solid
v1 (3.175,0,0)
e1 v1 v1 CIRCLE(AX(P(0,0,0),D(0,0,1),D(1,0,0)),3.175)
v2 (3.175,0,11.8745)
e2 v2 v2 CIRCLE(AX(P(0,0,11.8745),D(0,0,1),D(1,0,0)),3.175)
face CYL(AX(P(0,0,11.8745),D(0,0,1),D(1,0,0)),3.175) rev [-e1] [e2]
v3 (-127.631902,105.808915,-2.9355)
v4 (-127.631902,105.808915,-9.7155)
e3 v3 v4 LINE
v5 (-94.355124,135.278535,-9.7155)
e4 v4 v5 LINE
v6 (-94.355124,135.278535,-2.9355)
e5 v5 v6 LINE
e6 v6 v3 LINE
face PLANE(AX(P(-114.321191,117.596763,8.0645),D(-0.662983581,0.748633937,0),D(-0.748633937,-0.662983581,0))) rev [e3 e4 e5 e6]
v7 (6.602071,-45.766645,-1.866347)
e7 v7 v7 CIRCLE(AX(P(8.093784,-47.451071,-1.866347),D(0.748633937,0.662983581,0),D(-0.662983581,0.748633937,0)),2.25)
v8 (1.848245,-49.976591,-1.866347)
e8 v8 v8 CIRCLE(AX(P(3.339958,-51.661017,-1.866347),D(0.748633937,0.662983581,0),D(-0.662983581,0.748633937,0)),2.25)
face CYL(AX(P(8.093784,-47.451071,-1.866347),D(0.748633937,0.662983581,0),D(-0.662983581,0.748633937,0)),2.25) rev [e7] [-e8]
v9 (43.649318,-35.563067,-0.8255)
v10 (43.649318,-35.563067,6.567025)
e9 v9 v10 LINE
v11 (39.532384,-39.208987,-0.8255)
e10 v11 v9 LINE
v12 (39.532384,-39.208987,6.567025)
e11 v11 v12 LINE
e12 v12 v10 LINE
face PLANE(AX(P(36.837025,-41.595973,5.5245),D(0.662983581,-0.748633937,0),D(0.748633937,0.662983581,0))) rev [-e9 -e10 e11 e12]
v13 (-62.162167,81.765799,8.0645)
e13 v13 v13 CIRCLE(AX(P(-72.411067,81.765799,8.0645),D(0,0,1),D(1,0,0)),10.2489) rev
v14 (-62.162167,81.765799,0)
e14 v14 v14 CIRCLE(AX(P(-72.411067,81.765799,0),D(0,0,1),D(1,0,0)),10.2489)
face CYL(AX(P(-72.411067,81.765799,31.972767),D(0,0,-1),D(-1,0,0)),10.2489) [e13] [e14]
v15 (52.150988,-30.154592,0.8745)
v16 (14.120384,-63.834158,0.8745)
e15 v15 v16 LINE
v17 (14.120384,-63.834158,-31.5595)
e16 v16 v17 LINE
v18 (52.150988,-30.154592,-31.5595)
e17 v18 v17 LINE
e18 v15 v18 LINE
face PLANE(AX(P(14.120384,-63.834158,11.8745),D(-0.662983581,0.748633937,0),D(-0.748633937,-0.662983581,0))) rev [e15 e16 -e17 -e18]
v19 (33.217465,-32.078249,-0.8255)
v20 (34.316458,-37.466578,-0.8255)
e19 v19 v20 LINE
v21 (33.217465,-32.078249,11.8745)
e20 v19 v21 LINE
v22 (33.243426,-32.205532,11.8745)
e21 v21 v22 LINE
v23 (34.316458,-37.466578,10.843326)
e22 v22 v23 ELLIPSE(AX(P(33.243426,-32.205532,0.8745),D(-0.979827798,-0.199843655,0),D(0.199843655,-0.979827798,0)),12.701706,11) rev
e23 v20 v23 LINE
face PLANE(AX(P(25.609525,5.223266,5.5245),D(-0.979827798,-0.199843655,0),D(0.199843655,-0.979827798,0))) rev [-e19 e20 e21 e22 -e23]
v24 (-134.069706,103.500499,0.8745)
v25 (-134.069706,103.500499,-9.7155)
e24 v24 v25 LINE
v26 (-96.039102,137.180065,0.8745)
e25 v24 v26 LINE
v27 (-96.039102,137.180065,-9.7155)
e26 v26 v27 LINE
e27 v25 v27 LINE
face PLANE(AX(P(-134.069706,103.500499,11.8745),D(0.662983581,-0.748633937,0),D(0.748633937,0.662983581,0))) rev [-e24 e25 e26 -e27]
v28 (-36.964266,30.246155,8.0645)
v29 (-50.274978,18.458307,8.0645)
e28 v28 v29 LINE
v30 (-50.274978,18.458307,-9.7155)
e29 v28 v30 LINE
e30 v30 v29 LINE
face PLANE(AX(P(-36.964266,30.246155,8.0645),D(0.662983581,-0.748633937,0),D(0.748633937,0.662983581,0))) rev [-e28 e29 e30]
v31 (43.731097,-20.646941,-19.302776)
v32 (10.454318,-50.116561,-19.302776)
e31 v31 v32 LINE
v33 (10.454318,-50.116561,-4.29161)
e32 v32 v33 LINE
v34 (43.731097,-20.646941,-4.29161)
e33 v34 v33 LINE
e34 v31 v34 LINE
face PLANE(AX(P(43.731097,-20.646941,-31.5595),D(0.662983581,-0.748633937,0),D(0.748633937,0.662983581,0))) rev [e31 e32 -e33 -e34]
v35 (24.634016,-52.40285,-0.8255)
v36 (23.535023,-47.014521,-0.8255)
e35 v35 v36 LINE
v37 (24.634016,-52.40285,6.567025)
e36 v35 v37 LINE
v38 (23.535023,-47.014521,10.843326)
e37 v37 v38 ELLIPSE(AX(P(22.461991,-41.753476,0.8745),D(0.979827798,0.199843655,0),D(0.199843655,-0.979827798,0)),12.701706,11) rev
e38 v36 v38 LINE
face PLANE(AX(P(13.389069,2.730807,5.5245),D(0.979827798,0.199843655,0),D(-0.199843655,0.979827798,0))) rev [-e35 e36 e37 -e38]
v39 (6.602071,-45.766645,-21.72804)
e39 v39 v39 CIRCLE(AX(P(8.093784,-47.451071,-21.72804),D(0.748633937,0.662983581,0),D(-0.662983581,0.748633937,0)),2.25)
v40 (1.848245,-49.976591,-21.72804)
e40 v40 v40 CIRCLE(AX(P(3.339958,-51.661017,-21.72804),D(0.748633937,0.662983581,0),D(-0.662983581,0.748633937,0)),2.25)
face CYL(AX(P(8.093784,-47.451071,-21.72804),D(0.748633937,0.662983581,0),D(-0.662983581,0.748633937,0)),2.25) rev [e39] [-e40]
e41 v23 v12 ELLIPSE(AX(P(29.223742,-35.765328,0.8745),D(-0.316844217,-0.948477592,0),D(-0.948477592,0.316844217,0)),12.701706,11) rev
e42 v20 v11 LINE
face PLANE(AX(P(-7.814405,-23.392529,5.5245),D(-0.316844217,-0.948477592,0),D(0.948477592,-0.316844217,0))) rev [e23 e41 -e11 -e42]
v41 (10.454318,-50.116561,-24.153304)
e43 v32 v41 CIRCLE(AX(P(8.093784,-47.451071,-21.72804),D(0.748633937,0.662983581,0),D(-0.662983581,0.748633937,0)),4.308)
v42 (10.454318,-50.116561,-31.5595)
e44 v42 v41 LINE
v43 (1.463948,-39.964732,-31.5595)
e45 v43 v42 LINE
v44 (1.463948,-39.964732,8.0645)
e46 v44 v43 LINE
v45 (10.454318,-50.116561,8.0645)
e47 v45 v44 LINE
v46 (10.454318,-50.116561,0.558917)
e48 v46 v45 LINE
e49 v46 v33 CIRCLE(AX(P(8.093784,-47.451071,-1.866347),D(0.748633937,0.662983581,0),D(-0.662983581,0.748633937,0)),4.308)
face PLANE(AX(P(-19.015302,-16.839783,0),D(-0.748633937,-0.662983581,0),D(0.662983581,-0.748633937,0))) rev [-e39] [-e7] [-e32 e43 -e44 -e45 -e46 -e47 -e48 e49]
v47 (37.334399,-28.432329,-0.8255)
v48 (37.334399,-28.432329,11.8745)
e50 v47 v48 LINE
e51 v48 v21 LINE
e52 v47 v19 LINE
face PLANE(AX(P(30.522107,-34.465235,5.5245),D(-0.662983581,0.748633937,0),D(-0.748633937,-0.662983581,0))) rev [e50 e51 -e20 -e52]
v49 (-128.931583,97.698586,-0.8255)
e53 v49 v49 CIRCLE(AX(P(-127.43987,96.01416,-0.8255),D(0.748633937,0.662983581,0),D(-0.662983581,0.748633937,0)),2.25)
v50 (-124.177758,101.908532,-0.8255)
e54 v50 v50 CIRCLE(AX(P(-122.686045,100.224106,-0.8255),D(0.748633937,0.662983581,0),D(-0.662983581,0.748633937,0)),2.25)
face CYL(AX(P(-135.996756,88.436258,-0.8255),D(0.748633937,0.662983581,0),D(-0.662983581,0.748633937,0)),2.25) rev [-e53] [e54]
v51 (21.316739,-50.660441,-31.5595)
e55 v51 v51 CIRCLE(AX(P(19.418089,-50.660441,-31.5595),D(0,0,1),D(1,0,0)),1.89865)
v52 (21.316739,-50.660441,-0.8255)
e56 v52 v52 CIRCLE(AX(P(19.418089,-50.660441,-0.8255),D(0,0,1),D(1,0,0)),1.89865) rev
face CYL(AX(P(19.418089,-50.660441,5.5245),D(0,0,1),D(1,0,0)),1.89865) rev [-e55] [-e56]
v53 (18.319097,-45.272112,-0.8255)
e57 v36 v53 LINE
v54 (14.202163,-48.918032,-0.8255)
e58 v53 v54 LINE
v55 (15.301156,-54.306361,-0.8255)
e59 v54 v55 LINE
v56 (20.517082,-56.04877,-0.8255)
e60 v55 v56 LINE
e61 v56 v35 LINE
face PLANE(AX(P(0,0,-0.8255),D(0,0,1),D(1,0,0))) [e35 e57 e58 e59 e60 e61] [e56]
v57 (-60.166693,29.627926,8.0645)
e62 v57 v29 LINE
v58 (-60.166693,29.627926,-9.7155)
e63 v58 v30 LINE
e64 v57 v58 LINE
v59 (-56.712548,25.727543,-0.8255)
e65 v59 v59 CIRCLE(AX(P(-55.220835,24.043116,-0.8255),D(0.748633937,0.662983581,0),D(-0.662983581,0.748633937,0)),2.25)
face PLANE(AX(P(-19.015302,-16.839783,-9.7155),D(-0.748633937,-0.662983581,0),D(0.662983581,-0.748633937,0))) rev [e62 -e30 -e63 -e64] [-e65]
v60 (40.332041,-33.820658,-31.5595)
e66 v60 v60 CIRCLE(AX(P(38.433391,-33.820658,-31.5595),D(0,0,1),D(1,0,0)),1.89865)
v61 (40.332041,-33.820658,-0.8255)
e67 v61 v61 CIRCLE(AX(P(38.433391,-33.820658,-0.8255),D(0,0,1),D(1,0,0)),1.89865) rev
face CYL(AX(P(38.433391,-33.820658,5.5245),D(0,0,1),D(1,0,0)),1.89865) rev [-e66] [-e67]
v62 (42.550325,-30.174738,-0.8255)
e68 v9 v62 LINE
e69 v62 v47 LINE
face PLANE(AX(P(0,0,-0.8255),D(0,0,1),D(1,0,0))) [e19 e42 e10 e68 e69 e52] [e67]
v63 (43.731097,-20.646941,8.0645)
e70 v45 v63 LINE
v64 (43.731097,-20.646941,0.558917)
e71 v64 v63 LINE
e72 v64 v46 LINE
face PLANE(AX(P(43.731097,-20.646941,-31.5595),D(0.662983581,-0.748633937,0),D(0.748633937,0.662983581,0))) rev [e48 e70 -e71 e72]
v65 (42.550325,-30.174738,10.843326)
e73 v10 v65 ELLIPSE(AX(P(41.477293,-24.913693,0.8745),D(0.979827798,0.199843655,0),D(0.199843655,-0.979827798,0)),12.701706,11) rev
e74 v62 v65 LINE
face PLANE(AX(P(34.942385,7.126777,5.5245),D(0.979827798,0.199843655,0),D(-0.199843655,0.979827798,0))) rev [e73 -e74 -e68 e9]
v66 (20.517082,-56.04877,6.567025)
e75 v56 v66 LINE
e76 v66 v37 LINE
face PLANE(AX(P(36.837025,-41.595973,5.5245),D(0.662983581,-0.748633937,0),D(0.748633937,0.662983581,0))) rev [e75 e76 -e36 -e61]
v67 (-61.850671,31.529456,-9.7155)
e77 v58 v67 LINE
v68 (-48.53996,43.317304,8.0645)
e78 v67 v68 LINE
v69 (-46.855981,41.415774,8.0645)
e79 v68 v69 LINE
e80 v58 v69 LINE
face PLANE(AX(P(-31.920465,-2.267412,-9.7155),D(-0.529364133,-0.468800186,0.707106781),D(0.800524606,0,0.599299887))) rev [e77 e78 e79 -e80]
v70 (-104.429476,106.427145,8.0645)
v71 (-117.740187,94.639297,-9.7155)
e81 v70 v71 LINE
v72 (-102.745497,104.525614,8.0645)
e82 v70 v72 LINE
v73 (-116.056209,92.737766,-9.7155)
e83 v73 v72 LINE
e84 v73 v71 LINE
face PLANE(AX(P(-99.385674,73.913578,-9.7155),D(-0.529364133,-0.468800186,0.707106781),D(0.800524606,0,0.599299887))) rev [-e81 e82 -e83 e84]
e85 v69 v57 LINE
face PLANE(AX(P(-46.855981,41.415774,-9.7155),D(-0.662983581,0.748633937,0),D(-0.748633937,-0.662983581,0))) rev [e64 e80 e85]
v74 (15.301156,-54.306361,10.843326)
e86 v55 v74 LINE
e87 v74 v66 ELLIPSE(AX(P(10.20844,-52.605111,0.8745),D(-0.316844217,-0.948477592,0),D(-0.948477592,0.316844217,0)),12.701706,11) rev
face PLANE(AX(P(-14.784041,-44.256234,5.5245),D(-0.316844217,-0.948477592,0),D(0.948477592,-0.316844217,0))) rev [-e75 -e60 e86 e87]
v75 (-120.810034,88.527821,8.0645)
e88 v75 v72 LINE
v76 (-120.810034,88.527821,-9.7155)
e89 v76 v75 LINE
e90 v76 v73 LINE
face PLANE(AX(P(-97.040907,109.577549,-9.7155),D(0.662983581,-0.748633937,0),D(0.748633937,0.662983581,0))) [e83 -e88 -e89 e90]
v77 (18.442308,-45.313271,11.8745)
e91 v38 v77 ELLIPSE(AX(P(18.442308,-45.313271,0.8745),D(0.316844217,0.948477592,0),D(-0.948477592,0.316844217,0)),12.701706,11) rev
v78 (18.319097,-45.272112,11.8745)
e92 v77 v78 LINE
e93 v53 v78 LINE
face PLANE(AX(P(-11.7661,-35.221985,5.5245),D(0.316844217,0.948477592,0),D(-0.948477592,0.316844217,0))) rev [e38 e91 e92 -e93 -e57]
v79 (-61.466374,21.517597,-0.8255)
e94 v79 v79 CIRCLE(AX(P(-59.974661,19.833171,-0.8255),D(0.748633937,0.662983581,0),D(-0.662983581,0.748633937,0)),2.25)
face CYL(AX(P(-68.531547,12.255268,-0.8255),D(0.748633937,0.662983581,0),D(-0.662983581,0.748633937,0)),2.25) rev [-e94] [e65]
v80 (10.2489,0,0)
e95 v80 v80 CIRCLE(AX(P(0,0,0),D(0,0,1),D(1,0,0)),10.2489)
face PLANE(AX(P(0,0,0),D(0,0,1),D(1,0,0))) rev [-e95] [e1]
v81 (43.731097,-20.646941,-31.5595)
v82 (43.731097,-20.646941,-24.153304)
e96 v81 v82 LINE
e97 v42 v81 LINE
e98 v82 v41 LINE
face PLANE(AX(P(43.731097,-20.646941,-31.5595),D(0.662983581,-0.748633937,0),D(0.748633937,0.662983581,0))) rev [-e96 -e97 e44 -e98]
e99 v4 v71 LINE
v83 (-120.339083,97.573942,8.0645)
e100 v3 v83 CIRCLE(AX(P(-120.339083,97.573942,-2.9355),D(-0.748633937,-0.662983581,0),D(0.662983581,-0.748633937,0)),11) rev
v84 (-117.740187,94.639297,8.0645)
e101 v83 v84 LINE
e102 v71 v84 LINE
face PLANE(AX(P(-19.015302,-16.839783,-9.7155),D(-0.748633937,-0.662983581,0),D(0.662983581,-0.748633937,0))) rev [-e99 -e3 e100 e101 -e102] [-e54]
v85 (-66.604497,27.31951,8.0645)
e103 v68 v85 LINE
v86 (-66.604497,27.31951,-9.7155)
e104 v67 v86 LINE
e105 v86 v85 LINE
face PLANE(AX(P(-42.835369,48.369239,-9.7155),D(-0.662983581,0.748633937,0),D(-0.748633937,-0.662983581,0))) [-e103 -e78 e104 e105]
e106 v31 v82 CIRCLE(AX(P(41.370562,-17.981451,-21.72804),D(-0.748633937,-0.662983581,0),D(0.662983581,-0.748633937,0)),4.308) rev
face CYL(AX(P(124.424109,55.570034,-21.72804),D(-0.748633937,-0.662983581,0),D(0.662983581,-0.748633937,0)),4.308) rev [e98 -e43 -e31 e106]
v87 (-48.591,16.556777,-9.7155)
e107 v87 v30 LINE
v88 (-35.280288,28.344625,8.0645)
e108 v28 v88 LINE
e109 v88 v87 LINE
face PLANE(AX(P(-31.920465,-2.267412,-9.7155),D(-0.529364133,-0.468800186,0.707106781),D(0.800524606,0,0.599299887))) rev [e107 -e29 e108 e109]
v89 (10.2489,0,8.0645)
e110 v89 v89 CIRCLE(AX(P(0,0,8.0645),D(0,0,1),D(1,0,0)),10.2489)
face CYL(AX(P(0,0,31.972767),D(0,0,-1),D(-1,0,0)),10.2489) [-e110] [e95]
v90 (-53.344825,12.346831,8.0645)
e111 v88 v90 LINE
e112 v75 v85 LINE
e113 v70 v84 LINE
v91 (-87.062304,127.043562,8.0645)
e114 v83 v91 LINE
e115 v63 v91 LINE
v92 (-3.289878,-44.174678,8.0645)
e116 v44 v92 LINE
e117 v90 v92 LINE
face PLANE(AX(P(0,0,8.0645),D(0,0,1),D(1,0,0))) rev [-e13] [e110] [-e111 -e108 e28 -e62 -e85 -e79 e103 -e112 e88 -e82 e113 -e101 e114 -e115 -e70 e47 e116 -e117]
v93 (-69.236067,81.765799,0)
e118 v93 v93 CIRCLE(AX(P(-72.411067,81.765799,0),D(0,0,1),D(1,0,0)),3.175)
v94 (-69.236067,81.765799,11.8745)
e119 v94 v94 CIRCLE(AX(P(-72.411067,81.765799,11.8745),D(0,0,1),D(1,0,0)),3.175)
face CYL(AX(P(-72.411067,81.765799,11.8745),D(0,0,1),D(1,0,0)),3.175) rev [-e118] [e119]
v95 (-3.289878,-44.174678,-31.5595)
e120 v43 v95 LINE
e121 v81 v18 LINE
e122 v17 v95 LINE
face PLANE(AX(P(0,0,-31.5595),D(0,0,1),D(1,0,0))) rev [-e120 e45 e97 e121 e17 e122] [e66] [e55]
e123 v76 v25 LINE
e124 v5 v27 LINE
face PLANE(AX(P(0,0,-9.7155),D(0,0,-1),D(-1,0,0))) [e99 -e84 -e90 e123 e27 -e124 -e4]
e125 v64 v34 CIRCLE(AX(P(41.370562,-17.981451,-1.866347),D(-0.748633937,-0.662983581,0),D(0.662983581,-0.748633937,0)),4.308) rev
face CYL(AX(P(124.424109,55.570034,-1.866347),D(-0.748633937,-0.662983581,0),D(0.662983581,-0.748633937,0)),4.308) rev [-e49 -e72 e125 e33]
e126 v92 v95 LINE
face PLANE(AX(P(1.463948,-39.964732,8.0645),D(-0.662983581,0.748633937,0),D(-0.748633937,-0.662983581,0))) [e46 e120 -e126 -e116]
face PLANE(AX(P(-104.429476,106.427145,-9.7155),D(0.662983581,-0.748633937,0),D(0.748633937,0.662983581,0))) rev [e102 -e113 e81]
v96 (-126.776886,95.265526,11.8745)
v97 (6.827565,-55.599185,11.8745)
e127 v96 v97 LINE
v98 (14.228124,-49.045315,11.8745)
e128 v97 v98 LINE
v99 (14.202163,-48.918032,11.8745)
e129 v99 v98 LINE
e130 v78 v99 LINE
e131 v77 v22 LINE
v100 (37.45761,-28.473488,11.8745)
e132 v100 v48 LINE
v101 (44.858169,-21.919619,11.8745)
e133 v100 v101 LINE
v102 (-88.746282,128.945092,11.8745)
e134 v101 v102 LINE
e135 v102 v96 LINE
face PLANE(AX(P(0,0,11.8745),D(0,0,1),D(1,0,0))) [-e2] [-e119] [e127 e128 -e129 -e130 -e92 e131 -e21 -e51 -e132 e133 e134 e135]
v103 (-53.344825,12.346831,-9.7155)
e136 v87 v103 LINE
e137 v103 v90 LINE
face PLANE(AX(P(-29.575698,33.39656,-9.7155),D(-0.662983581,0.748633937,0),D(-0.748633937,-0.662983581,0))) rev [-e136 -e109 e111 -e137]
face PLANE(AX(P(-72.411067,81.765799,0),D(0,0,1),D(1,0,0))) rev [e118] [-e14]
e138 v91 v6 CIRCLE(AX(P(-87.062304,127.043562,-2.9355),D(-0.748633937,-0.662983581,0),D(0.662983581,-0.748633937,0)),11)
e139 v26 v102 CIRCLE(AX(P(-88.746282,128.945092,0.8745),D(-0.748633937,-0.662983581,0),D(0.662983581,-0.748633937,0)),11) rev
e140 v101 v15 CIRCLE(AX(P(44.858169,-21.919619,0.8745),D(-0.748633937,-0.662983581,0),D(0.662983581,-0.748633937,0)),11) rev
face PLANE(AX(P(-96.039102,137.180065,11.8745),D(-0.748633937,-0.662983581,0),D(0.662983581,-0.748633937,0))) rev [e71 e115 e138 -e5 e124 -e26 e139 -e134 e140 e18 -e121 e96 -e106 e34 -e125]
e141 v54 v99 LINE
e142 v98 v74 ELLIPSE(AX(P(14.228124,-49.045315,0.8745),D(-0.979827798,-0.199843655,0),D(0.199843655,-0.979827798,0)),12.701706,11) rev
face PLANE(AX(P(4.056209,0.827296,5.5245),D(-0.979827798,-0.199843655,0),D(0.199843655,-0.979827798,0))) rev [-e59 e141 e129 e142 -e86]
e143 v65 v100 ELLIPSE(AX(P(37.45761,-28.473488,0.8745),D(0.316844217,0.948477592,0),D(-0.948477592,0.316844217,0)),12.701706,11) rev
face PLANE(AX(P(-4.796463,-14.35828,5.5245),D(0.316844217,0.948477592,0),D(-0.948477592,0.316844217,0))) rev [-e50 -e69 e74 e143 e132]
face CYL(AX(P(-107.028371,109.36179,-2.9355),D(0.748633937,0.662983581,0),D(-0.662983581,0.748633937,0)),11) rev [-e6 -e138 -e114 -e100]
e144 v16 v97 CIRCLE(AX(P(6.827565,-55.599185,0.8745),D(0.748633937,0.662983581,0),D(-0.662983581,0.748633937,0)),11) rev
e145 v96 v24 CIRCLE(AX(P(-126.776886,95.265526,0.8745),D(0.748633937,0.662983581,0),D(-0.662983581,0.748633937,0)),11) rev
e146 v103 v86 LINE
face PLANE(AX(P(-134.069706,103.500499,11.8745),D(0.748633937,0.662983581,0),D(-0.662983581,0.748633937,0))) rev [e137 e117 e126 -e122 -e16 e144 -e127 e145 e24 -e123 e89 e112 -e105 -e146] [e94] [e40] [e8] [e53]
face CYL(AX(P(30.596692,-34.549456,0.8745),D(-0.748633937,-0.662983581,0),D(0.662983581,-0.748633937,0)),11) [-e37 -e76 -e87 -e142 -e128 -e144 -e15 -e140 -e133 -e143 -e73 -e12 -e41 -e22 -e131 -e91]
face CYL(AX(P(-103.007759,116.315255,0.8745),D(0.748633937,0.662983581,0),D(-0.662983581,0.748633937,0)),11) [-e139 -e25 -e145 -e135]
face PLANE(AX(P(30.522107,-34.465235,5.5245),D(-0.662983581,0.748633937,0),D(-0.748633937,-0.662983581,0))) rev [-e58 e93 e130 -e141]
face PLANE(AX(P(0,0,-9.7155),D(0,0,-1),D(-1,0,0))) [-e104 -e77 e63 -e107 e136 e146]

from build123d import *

# Parameters (mm, degrees)
SKETCH1_R                   = 10.2489
BOSS_EXTRUDE1_DEPTH         = 2.9845
BOSS_EXTRUDE1_2_DEPTH       = 2.9845
SKETCH2_R                   = 10.2489
BOSS_EXTRUDE2_DEPTH         = 5.08
BOSS_EXTRUDE3_DEPTH         = 3.81
F_1_4_0_25_DIAMETER_HOLE1_D = 6.35
BOSS_EXTRUDE4_DEPTH         = 17.78
SKETCH8_R                   = 2.25
CUT_EXTRUDE1_DEPTH          = 17.78
SKETCH9_W                   = 17.78
SKETCH9_H                   = 2.54
BOSS_EXTRUDE5_DEPTH         = 17.78
CUT_EXTRUDE2_REACH          = 251.039
CUT_EXTRUDE3_DEPTH          = 20
BOSS_EXTRUDE6_DEPTH         = 2.54
BOSS_EXTRUDE7_DEPTH         = 39.624
CUT_EXTRUDE5_DEPTH          = 6.35
F_6_CLEARANCE_HOLE1_D       = 3.7973
SKETCH19_W                  = 39.624
SKETCH19_H                  = 13.560471889
BOSS_EXTRUDE8_DEPTH         = 6.35
M4_CLEARANCE_HOLE1_D        = 4.5
SKETCH20_R                  = 4.308
CUT_EXTRUDE6_DEPTH          = 195.822050963
FILLET1_R                   = 11
CUT_EXTRUDE7_DEPTH          = 6.35


with BuildPart() as part:
    # Sketch1 → Boss-Extrude1 (new body)
    with BuildSketch(Plane.XY):
        Circle(SKETCH1_R)
    extrude(amount=BOSS_EXTRUDE1_DEPTH)



with BuildPart() as body_2:
    # Sketch1 → Boss-Extrude1 2 (new body)
    with BuildSketch(Plane.XY):
        with Locations((-72.411066703, 81.765798589)):
            Circle(SKETCH1_R)
    extrude(amount=BOSS_EXTRUDE1_2_DEPTH)


with BuildPart() as part_1:
    add(part.part)

    add(body_2.part)  # Boss-Extrude2 merges body 2
    # Sketch2 → Boss-Extrude2 (add)
    with BuildSketch(Plane.XY.offset(2.9845)):
        with Locations((-72.411066703, 81.765798589)):
            Circle(SKETCH2_R)
        Circle(SKETCH2_R)
    extrude(amount=BOSS_EXTRUDE2_DEPTH)

    # Sketch3 → Boss-Extrude3 (add)
    with BuildSketch(Plane.XY.offset(8.0645)):
        Polygon((-134.069705847, 103.500499391), (-96.039101852, 137.180065299), (52.150988145, -30.154592279), (14.12038415, -63.834158187), align=None)
    extrude(amount=BOSS_EXTRUDE3_DEPTH)

    # 1/4 (0.25) Diameter Hole1 (through all)
    with Locations(Plane.XY.offset(11.8745)):
        with Locations((0, 0), (-72.411066703, 81.765798589)):
            Hole(F_1_4_0_25_DIAMETER_HOLE1_D / 2)

    # Sketch7 → Boss-Extrude4 (add)
    with BuildSketch(Plane(origin=(0, 0, 8.0645), x_dir=(-1, 0, 0), z_dir=(0, 0, -1))):
        Polygon((53.34482504, 12.346831233), (66.604496657, 27.319509971), (61.850671158, 31.529455709), (48.59099954, 16.556776971), align=None)
        Polygon((120.810034229, 88.527820652), (134.069705847, 103.500499391), (129.315880348, 107.710445129), (116.05620873, 92.737766391), align=None)
    extrude(amount=BOSS_EXTRUDE4_DEPTH)

    # Sketch8 → Cut-Extrude1 (cut)
    with BuildSketch(Plane(origin=(-19.015301997, -16.839782954, 0), x_dir=(0, 0, -1), z_dir=(0.7486339369082552, 0.6629835808745542, 0))):
        with Locations(Location((0.8255, 54.61, 0), (0, 0, 90))):
            Circle(SKETCH8_R)
        with Locations(Location((0.8255, 156.37, 0), (0, 0, 90))):
            Circle(SKETCH8_R)
    extrude(amount=-CUT_EXTRUDE1_DEPTH, mode=Mode.SUBTRACT)

    # Sketch9 → Boss-Extrude5 (add)
    with BuildSketch(Plane(origin=(-19.015301997, -16.839782954, 0), x_dir=(0, 0, -1), z_dir=(0.7486339369082552, 0.6629835808745542, 0))):
        with Locations((0.8255, 63.34)):
            Rectangle(SKETCH9_W, SKETCH9_H)
        with Locations((0.8255, 45.88)):
            Rectangle(SKETCH9_W, SKETCH9_H)
        with Locations((0.8255, 165.1)):
            Rectangle(SKETCH9_W, SKETCH9_H)
        with Locations((0.8255, 147.64)):
            Rectangle(SKETCH9_W, SKETCH9_H)
    extrude(amount=BOSS_EXTRUDE5_DEPTH)

    # Cut-Extrude2: up to this face of the body (flat: up to its plane)
    cut_extrude2_end = Plane(part_1.part.faces().sort_by_distance((-111.777765781, 96.526717556, -0.8255))[0])
    # Sketch10 → Cut-Extrude2 (cut, up to the picked face)
    with BuildSketch(Plane(origin=(-110.30057835, 124.550228083, 0), x_dir=(0.7486339369082557, 0.6629835808745536, 0), z_dir=(-0.6629835808745536, 0.7486339369082557, 0)), mode=Mode.PRIVATE) as cut_extrude2_sk1:
        Polygon((-7.62, 9.7155), (-7.62, -8.0645), (-25.4, 9.7155), align=None)
    cut_extrude2_tool1 = split(extrude(cut_extrude2_sk1.sketch, amount=-CUT_EXTRUDE2_REACH, mode=Mode.PRIVATE), bisect_by=cut_extrude2_end, keep=Keep.BOTH, mode=Mode.PRIVATE)
    add(cut_extrude2_tool1.solids().sort_by(Axis((-120.442073, 115.569011, -3.788833), (0.6629835808745536, -0.7486339369082557, 0)))[0], mode=Mode.SUBTRACT)

    # Sketch11 → Cut-Extrude3 (cut)
    with BuildSketch(Plane(origin=(-42.83536916, 48.369238664, 0), x_dir=(0.7486339369082559, 0.6629835808745536, 0), z_dir=(-0.6629835808745536, 0.7486339369082559, 0))):
        Polygon((-7.62, 9.7155), (-7.62, -8.0645), (-25.4, 9.7155), align=None)
    extrude(amount=-CUT_EXTRUDE3_DEPTH, mode=Mode.SUBTRACT)

    # Sketch13 → Boss-Extrude6 (add)
    with BuildSketch(Plane(origin=(-110.30057835, 124.550228083, 0), x_dir=(0.7486339369082557, 0.6629835808745536, 0), z_dir=(-0.6629835808745536, 0.7486339369082557, 0))):
        Polygon((-25.4, 9.7155), (19.05, 9.7155), (19.05, -8.0645), (-7.62, -8.0645), align=None)
    extrude(amount=-BOSS_EXTRUDE6_DEPTH)

    # Sketch14 → Boss-Extrude7 (add)
    with BuildSketch(Plane(origin=(0, 0, 8.0645), x_dir=(-1, 0, 0), z_dir=(0, 0, -1))):
        Polygon((-52.150988145, -30.154592279), (-14.12038415, -63.834158187), (-5.700492673, -54.326507188), (-43.731096668, -20.64694128), align=None)
    extrude(amount=BOSS_EXTRUDE7_DEPTH)

    # Sketch15 → Cut-Extrude5 (cut)
    with BuildSketch(Plane.XY.offset(11.8745)):
        Polygon((38.433391408, -33.820658256), (42.550325055, -30.174738298), (37.334398928, -28.432329153), (33.21746528, -32.078249111), (33.824088825, -35.052507224), align=None)
        Polygon((43.649317536, -35.563067402), (43.042693991, -32.588809289), (38.433391408, -33.820658256), (34.31645776, -37.466578215), (39.532383888, -39.20898736), align=None)
        Polygon((38.433391408, -33.820658256), (43.042693991, -32.588809289), (42.550325055, -30.174738298), align=None)
        Polygon((34.31645776, -37.466578215), (38.433391408, -33.820658256), (33.824088825, -35.052507224), align=None)
        Polygon((21.198191786, -46.233889763), (19.41808941, -50.660441211), (23.535023058, -47.014521252), align=None)
        Polygon((15.301155763, -54.306361169), (17.637987035, -55.086992658), (19.41808941, -50.660441211), align=None)
        Polygon((14.202163283, -48.918032065), (15.301155763, -54.306361169), (19.41808941, -50.660441211), (21.198191786, -46.233889763), (18.31909693, -45.272112107), align=None)
        Polygon((19.41808941, -50.660441211), (17.637987035, -55.086992658), (20.51708189, -56.048770314), (24.634015538, -52.402850356), (23.535023058, -47.014521252), align=None)
    extrude(amount=-CUT_EXTRUDE5_DEPTH, mode=Mode.SUBTRACT)

    # #6 Clearance Hole1 (through all)
    with Locations(Plane.XY.offset(5.5245)):
        with Locations((19.41808941, -50.660441211), (38.433391408, -33.820658256)):
            Hole(F_6_CLEARANCE_HOLE1_D / 2)

    # Sketch19 → Boss-Extrude8 (add)
    with BuildSketch(Plane(origin=(-23.769127497, -21.049728693, 0), x_dir=(0, 0, 1), z_dir=(-0.7486339369082559, -0.6629835808745536, 0))):
        with Locations((-11.7475, -37.669764056)):
            Rectangle(SKETCH19_W, SKETCH19_H)
    extrude(amount=-BOSS_EXTRUDE8_DEPTH)

    # M4 Clearance Hole1 (through all)
    with Locations(Plane(origin=(-19.015301997, -16.839782954, 0), x_dir=(0, 0, -1), z_dir=(0.7486339369082555, 0.6629835808745539, 0))):
        with Locations((1.866346616, -40.889528111), (21.728039849, -40.889528111)):
            Hole(M4_CLEARANCE_HOLE1_D / 2)

    # Sketch20 → Cut-Extrude6 (cut, through all)
    with BuildSketch(Plane(origin=(-19.015301997, -16.839782954, 0), x_dir=(0, 0, -1), z_dir=(0.7486339369082555, 0.6629835808745539, 0))):
        with Locations((21.728039849, -40.889528111)):
            Circle(SKETCH20_R)
        with Locations((1.866346616, -40.889528111)):
            Circle(SKETCH20_R)
    extrude(amount=CUT_EXTRUDE6_DEPTH, mode=Mode.SUBTRACT)

    # Fillet1
    # the kernel refuses this fillet: 11 mm, written as the material it adds along each edge
    with BuildSketch(Plane(origin=(-127.631902052, 105.808914929, 8.0645), x_dir=(0.6629835808745532, -0.7486339369082561, 1.2918958832001814e-15), z_dir=(0.7486339369082562, 0.6629835808745532, 0))) as fillet1_piece_1:
        with BuildLine():
            CenterArc((FILLET1_R, FILLET1_R), FILLET1_R, 180, 90)
            Line((0, FILLET1_R), (0, 0))
            Line((0, 0), (FILLET1_R, 0))
        make_face()
    extrude(amount=44.45)
    # the kernel refuses this fillet: 11 mm, written as the material it takes off along each edge
    with BuildSketch(Plane(origin=(-154.657139112, 85.268450917, 11.8745), x_dir=(0, 0, -1), z_dir=(0.7486339369082557, 0.6629835808745537, 0))) as fillet1_2_piece_1:
        with BuildLine():
            CenterArc((FILLET1_R, -FILLET1_R), FILLET1_R, 90, 90)
            Line((0, -FILLET1_R), (0, 0))
            Line((0, 0), (FILLET1_R, 0))
        make_face()
    extrude(amount=105.8, mode=Mode.SUBTRACT)
    with BuildSketch(Plane(origin=(72.73842141, -11.922543805, 11.8745), x_dir=(-0.6629835808745536, 0.7486339369082557, 0), z_dir=(-0.7486339369082559, -0.6629835808745537, 0))) as fillet1_2_piece_2:
        with BuildLine():
            CenterArc((FILLET1_R, FILLET1_R), FILLET1_R, 180, 90)
            Line((0, FILLET1_R), (0, 0))
            Line((0, 0), (FILLET1_R, 0))
        make_face()
    extrude(amount=105.8, mode=Mode.SUBTRACT)

    # Sketch23 → Cut-Extrude7 (cut)
    with BuildSketch(Plane.XY.offset(5.5245)):
        Polygon((37.334398928, -28.432329153), (33.21746528, -32.078249111), (34.31645776, -37.466578215), (39.532383888, -39.20898736), (43.649317536, -35.563067402), (42.550325055, -30.174738298), align=None)
        Polygon((14.202163283, -48.918032065), (15.301155763, -54.306361169), (20.51708189, -56.048770314), (24.634015538, -52.402850356), (23.535023058, -47.014521252), (18.31909693, -45.272112107), align=None)
    extrude(amount=-CUT_EXTRUDE7_DEPTH, mode=Mode.SUBTRACT)


solid = part_1.part
